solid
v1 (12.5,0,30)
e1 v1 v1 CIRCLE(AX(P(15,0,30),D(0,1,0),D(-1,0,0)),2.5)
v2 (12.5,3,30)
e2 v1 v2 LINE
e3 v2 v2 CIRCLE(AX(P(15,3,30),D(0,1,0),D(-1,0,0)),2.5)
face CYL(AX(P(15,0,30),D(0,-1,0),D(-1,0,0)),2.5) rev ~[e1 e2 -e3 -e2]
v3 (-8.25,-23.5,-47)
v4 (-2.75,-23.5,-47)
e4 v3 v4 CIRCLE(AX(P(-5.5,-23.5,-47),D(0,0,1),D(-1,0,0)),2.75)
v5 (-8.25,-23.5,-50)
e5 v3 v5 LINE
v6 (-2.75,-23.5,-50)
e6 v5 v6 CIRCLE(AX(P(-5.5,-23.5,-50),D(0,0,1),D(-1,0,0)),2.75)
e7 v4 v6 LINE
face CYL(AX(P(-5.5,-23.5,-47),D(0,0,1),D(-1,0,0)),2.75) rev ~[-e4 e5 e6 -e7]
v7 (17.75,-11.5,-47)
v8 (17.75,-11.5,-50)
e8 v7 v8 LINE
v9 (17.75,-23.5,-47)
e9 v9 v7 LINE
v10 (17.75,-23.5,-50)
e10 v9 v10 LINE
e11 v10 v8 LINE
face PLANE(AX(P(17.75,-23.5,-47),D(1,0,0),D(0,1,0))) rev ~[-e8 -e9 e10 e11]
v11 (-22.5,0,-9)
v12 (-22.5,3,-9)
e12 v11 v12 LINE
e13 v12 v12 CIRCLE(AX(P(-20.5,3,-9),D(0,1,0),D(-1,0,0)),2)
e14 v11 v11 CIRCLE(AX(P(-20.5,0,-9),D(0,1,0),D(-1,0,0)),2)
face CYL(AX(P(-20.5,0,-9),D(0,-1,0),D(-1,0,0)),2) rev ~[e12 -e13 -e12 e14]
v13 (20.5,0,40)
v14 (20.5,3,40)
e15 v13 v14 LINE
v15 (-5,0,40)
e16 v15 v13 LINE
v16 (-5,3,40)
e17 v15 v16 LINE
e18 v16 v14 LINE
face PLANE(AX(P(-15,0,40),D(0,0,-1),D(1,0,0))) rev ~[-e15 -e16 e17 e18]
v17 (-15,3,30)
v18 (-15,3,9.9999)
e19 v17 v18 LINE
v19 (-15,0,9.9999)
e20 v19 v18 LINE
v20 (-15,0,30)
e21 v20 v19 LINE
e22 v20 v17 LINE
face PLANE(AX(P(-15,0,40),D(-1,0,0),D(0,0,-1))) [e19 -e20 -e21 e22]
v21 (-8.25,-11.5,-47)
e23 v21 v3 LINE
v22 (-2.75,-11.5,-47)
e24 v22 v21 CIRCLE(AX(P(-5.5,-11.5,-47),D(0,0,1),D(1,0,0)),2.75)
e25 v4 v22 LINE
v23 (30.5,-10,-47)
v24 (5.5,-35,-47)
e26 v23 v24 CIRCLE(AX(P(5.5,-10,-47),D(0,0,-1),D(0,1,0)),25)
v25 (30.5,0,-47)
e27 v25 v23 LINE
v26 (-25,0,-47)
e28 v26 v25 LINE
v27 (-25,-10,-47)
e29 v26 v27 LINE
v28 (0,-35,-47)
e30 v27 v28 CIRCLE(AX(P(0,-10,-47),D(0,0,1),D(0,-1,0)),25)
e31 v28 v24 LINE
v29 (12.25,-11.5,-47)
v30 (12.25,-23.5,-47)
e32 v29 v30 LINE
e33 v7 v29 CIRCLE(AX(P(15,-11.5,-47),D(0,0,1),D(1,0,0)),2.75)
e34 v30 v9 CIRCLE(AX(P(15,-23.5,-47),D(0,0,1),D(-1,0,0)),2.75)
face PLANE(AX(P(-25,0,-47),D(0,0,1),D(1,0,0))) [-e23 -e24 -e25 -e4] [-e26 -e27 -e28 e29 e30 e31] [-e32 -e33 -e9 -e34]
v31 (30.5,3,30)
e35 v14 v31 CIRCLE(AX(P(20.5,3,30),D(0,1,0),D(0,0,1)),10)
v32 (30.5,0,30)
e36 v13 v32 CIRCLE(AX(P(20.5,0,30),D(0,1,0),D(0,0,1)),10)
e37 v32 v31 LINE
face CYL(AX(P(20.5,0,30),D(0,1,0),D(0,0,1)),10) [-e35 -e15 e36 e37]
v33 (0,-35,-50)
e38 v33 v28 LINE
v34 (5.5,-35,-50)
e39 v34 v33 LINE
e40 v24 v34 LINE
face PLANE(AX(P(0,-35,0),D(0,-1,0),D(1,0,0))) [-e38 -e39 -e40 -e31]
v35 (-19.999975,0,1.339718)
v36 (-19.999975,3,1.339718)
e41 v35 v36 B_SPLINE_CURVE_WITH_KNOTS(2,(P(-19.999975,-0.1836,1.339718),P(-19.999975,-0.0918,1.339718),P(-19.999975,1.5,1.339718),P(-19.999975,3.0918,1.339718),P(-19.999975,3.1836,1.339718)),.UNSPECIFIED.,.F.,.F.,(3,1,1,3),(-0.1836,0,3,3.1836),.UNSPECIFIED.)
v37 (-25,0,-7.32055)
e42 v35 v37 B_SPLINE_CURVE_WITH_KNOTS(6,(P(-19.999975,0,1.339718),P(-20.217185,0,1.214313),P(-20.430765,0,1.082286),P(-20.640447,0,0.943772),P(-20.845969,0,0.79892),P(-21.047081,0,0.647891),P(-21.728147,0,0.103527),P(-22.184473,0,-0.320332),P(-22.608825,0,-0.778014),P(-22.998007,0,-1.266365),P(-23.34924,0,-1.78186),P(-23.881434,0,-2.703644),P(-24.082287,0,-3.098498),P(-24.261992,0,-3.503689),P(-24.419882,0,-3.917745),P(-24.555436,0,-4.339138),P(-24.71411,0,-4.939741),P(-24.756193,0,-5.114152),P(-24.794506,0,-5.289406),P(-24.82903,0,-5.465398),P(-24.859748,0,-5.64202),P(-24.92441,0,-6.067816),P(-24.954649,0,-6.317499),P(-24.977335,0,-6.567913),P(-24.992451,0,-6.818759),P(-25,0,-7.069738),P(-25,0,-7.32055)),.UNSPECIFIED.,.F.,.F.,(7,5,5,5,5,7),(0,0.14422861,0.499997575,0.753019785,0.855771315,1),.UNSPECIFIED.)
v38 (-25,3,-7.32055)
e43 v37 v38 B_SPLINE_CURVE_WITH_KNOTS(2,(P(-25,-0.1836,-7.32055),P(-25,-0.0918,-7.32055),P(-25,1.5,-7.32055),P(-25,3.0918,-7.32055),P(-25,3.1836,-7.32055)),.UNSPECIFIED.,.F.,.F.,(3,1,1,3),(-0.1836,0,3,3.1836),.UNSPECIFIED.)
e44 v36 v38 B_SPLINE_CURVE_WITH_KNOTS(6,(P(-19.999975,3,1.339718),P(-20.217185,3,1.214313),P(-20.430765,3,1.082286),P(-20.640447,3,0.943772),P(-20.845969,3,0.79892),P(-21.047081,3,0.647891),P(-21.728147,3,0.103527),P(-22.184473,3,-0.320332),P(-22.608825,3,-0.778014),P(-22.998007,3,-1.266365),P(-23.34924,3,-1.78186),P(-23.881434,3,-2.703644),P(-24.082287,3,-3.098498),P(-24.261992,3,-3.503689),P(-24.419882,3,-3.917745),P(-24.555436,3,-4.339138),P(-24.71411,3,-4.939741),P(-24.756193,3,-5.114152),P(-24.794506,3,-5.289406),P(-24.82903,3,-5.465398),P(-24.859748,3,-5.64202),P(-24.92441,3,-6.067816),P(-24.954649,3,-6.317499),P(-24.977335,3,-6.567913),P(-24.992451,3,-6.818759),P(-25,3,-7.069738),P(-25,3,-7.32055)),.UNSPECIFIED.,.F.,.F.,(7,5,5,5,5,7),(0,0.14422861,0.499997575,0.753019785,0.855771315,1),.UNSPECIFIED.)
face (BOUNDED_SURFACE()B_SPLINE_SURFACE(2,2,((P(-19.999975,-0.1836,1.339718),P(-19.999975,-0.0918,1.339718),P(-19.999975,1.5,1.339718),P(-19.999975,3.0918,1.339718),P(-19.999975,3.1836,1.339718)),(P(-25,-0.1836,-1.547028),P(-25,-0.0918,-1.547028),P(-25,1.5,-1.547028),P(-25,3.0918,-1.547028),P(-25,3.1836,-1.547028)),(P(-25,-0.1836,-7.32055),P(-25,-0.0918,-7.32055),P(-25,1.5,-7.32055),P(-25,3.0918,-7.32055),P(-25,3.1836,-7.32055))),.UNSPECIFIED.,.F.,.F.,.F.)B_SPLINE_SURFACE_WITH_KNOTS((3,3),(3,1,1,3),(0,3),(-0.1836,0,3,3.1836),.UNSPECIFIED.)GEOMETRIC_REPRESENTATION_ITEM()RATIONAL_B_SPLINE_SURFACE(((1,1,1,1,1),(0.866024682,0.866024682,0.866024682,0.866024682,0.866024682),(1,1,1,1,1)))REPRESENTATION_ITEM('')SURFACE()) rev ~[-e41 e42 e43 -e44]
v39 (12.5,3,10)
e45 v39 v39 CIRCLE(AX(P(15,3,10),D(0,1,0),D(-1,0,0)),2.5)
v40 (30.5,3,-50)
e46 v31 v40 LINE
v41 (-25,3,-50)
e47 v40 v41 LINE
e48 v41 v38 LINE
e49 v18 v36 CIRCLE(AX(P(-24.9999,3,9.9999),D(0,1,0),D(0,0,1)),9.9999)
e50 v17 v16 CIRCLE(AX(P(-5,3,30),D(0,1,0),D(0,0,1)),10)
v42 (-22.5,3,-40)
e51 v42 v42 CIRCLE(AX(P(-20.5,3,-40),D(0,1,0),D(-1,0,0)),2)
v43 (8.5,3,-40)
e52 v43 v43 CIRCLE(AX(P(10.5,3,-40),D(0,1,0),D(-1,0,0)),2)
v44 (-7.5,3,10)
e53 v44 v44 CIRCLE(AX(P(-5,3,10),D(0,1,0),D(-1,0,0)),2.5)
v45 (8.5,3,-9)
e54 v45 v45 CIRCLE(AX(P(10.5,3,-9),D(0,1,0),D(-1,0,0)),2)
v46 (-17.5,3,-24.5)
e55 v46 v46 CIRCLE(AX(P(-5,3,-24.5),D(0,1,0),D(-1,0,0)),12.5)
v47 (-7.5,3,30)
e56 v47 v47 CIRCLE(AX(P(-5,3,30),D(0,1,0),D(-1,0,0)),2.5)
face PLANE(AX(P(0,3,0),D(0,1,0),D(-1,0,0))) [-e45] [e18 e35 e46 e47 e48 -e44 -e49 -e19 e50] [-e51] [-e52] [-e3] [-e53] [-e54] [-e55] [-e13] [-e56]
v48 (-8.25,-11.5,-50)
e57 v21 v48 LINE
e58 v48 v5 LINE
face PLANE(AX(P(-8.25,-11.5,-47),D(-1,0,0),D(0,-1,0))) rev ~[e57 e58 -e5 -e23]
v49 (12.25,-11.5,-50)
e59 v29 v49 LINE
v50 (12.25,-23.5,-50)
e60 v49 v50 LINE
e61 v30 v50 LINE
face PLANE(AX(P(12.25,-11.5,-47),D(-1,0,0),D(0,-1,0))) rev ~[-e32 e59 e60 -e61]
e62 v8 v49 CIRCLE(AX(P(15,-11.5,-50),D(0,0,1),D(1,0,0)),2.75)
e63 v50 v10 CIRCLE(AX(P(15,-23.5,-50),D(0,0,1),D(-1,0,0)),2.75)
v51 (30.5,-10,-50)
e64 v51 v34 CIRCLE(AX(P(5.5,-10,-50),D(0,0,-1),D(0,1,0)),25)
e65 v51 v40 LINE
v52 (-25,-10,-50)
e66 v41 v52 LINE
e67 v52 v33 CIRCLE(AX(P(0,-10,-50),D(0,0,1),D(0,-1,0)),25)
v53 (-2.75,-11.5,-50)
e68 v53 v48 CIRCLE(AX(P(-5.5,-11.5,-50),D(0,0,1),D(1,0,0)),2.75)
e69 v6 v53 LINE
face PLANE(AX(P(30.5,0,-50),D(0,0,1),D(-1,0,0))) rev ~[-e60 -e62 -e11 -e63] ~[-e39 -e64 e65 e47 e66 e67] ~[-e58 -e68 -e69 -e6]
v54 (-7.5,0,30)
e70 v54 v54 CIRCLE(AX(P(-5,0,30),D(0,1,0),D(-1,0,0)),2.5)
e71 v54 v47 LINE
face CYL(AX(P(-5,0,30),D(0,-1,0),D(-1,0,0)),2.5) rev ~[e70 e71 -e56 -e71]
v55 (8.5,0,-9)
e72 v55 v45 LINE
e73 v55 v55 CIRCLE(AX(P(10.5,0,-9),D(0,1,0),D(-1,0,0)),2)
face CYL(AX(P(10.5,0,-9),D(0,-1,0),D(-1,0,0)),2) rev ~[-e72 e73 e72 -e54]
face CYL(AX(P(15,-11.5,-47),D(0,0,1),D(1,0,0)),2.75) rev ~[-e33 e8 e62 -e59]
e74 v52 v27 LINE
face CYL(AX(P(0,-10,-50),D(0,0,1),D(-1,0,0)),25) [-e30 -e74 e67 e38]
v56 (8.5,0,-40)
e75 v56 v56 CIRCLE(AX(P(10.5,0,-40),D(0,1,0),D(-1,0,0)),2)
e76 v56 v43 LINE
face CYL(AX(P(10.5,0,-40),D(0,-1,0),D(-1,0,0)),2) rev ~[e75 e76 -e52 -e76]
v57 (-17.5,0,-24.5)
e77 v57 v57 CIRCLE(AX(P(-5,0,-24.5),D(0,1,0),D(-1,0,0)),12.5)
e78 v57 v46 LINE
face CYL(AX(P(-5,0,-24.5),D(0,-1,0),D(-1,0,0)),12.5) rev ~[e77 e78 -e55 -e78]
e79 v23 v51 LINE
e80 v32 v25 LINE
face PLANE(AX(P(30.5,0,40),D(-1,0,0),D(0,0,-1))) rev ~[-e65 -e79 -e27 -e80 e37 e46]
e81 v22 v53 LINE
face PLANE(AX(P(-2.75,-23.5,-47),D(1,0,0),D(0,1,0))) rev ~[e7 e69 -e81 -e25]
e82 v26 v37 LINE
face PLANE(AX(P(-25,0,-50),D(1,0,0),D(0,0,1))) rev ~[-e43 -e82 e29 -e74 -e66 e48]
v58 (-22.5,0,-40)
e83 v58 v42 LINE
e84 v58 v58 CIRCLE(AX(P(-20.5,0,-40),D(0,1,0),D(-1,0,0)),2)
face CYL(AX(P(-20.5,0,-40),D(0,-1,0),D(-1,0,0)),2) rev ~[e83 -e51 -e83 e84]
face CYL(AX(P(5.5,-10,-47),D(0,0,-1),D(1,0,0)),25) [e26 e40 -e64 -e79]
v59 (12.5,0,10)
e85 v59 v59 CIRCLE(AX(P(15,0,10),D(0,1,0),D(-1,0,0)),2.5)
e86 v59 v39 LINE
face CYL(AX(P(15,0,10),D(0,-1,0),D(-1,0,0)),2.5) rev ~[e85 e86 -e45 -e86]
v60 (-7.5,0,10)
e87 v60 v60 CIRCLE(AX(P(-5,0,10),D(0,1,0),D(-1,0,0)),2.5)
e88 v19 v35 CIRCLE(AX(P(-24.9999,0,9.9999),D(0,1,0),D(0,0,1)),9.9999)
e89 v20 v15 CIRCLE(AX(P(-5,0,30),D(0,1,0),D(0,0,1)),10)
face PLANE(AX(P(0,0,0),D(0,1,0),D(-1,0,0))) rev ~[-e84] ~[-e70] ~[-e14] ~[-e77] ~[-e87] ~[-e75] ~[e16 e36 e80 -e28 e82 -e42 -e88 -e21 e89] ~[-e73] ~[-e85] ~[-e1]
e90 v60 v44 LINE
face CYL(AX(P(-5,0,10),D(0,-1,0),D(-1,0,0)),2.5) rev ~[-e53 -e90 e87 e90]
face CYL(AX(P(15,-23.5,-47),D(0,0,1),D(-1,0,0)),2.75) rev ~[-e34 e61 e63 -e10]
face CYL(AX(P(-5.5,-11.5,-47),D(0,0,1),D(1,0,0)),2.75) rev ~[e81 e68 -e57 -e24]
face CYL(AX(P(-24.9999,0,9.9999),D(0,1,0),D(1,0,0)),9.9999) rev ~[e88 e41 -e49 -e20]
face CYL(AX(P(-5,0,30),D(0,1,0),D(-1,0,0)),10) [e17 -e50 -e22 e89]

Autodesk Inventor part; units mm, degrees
ref_plane "YZ Plane" through (0, 0, 0) normal (1, 0, 0) x (0, 1, 0)
ref_plane "XZ Plane" through (0, 0, 0) normal (0, 1, 0) x (-1, 0, 0)
ref_plane "XY Plane" through (0, 0, 0) normal (0, 0, 1) x (1, 0, 0)
sketch "Sketch1" plane through (0, 0, 0) normal (0, 1, 0) x (-1, 0, 0)
  line L0 (25, 40) -> (-30.5, 40)
  line L1 (-30.5, 40) -> (-30.5, -50)
  line L2 (-30.5, -50) -> (25, -50)
  line L3 (25, -50) -> (25, 40)
  line L4 (25, 40) -> (15, 40)
  line L5 (15, 40) -> (15, 0)
  line L6 (25, -50) -> (25, -40) construction
  line L7 (25, -40) -> (20.5, -40) construction
  line L8 (20.5, -40) -> (20.5, -9) construction
  line L9 (20.5, -9) -> (-10.5, -9) construction
  line L10 (-10.5, -9) -> (-10.5, -40) construction
  line L11 (-10.5, -40) -> (20.5, -40) construction
  circle A0 centre (5, -24.5) radius 12.5
  circle A1 centre (20.5, -9) radius 2
  circle A2 centre (20.5, -40) radius 2
  circle A3 centre (-10.5, -9) radius 2
  circle A4 centre (-10.5, -40) radius 2
  line L12 (15, 40) -> (5, 40) construction
  line L13 (5, 40) -> (5, 30) construction
  line L14 (5, 30) -> (15, 30) construction
  line L15 (15, 30) -> (15, 40) construction
  line L16 (5, 30) -> (-15, 30) construction
  line L17 (-15, 30) -> (-15, 10) construction
  line L18 (-15, 10) -> (5, 10) construction
  line L19 (5, 10) -> (5, 30) construction
  circle A5 centre (5, 30) radius 2.5
  circle A6 centre (5, 10) radius 2.5
  circle A7 centre (-15, 30) radius 2.5
  circle A8 centre (-15, 10) radius 2.5
  line L20 (15, 0) -> (25, 0)
  point P0 (25, -5)
  dimension "d0" = 55.5
  dimension "d1" = 90
  dimension "d2" = 10
  dimension "d3" = 40
  dimension "d4" = 10
  dimension "d5" = 4.5
  dimension "d6" = 31
  dimension "d7" = 31
  dimension "d8" = 31
  dimension "d9" = 25
  dimension "d10" = 4
  dimension "d11" = 4
  dimension "d12" = 4
  dimension "d13" = 4
  dimension "d14" = 10
  dimension "d15" = 10
  dimension "d16" = 20
  dimension "d17" = 20
  dimension "d18" = 5
  dimension "d19" = 5
  dimension "d20" = 5
  dimension "d21" = 5
  dimension "d25" = 15.5
extrude "Extrusion1" add sketch "Sketch1" along normal blind 3 contours L5 L20 L3 L2 L1 L0
sketch "Sketch2" plane through (0, 0, 0) normal (0, -1, 0) x (1, 0, 0)
  line L0 (30.5, 40) -> (30.5, -50) projected
  line L1 (-25, -50) -> (-25, 0) projected
  line L2 (30.5, -50) -> (-25, -50)
  line L3 (-25, -50) -> (-25, -47)
  line L4 (-25, -47) -> (30.5, -47)
  line L5 (30.5, -47) -> (30.5, -50)
  point P0 (0, 0)
  dimension "d26" = 3
extrude "Extrusion2" add sketch "Sketch2" along normal blind 35
sketch "Sketch3" plane through (-25, 0, -47) normal (0, 0, 1) x (1, 0, 0)
  line L0 (55.5, -35) -> (55.5, 3) construction
  line L1 (0, 0) -> (0, -35) projected
  line L2 (10, 3) -> (55.5, 3) construction
  line L3 (55.5, 3) -> (55.5, -17.5) construction
  line L4 (55.5, -17.5) -> (0, -17.5) construction
  line L5 (0, 3) -> (0, -35) construction
  line L6 (55.5, -17.5) -> (40, -17.5) construction
  line L7 (40, -17.5) -> (19.5, -17.5) construction
  line L8 (19.5, -23.5) -> (19.5, -11.5) construction
  line L9 (22.25, -23.5) -> (22.25, -11.5)
  line L10 (16.75, -11.5) -> (16.75, -23.5)
  arc A0 (16.75, -23.5) -> (22.25, -23.5) centre (19.5, -23.5) ccw
  arc A1 (22.25, -11.5) -> (16.75, -11.5) centre (19.5, -11.5) ccw
  line L11 (40, -23.5) -> (40, -11.5) construction
  line L12 (42.75, -23.5) -> (42.75, -11.5)
  line L13 (37.25, -11.5) -> (37.25, -23.5)
  arc A2 (37.25, -23.5) -> (42.75, -23.5) centre (40, -23.5) ccw
  arc A3 (42.75, -11.5) -> (37.25, -11.5) centre (40, -11.5) ccw
  line L14 (10, 0) -> (55.5, 0) projected
  point P0 (25, 0)
  dimension "d38" = 15.5
  dimension "d39" = 20.5
  dimension "d40" = 6
  dimension "d41" = 5.5
  dimension "d42" = 6
  dimension "d43" = 5.5
  dimension "d47" = 17.5
extrude "Extrusion3" cut sketch "Sketch3" against normal through all
fillet "Fillet3" radius 10 4 edges at (-25, 1.5, 0) (-15, 1.5, 40) (30.5, 1.5, 40) (-15, 1.5, 0)
fillet "Fillet4" radius 25 2 edges at (-25, -35, -48.5) (30.5, -35, -48.5)
properties part number "ActuatorPulleyPlate" material "Aluminum 6061"
